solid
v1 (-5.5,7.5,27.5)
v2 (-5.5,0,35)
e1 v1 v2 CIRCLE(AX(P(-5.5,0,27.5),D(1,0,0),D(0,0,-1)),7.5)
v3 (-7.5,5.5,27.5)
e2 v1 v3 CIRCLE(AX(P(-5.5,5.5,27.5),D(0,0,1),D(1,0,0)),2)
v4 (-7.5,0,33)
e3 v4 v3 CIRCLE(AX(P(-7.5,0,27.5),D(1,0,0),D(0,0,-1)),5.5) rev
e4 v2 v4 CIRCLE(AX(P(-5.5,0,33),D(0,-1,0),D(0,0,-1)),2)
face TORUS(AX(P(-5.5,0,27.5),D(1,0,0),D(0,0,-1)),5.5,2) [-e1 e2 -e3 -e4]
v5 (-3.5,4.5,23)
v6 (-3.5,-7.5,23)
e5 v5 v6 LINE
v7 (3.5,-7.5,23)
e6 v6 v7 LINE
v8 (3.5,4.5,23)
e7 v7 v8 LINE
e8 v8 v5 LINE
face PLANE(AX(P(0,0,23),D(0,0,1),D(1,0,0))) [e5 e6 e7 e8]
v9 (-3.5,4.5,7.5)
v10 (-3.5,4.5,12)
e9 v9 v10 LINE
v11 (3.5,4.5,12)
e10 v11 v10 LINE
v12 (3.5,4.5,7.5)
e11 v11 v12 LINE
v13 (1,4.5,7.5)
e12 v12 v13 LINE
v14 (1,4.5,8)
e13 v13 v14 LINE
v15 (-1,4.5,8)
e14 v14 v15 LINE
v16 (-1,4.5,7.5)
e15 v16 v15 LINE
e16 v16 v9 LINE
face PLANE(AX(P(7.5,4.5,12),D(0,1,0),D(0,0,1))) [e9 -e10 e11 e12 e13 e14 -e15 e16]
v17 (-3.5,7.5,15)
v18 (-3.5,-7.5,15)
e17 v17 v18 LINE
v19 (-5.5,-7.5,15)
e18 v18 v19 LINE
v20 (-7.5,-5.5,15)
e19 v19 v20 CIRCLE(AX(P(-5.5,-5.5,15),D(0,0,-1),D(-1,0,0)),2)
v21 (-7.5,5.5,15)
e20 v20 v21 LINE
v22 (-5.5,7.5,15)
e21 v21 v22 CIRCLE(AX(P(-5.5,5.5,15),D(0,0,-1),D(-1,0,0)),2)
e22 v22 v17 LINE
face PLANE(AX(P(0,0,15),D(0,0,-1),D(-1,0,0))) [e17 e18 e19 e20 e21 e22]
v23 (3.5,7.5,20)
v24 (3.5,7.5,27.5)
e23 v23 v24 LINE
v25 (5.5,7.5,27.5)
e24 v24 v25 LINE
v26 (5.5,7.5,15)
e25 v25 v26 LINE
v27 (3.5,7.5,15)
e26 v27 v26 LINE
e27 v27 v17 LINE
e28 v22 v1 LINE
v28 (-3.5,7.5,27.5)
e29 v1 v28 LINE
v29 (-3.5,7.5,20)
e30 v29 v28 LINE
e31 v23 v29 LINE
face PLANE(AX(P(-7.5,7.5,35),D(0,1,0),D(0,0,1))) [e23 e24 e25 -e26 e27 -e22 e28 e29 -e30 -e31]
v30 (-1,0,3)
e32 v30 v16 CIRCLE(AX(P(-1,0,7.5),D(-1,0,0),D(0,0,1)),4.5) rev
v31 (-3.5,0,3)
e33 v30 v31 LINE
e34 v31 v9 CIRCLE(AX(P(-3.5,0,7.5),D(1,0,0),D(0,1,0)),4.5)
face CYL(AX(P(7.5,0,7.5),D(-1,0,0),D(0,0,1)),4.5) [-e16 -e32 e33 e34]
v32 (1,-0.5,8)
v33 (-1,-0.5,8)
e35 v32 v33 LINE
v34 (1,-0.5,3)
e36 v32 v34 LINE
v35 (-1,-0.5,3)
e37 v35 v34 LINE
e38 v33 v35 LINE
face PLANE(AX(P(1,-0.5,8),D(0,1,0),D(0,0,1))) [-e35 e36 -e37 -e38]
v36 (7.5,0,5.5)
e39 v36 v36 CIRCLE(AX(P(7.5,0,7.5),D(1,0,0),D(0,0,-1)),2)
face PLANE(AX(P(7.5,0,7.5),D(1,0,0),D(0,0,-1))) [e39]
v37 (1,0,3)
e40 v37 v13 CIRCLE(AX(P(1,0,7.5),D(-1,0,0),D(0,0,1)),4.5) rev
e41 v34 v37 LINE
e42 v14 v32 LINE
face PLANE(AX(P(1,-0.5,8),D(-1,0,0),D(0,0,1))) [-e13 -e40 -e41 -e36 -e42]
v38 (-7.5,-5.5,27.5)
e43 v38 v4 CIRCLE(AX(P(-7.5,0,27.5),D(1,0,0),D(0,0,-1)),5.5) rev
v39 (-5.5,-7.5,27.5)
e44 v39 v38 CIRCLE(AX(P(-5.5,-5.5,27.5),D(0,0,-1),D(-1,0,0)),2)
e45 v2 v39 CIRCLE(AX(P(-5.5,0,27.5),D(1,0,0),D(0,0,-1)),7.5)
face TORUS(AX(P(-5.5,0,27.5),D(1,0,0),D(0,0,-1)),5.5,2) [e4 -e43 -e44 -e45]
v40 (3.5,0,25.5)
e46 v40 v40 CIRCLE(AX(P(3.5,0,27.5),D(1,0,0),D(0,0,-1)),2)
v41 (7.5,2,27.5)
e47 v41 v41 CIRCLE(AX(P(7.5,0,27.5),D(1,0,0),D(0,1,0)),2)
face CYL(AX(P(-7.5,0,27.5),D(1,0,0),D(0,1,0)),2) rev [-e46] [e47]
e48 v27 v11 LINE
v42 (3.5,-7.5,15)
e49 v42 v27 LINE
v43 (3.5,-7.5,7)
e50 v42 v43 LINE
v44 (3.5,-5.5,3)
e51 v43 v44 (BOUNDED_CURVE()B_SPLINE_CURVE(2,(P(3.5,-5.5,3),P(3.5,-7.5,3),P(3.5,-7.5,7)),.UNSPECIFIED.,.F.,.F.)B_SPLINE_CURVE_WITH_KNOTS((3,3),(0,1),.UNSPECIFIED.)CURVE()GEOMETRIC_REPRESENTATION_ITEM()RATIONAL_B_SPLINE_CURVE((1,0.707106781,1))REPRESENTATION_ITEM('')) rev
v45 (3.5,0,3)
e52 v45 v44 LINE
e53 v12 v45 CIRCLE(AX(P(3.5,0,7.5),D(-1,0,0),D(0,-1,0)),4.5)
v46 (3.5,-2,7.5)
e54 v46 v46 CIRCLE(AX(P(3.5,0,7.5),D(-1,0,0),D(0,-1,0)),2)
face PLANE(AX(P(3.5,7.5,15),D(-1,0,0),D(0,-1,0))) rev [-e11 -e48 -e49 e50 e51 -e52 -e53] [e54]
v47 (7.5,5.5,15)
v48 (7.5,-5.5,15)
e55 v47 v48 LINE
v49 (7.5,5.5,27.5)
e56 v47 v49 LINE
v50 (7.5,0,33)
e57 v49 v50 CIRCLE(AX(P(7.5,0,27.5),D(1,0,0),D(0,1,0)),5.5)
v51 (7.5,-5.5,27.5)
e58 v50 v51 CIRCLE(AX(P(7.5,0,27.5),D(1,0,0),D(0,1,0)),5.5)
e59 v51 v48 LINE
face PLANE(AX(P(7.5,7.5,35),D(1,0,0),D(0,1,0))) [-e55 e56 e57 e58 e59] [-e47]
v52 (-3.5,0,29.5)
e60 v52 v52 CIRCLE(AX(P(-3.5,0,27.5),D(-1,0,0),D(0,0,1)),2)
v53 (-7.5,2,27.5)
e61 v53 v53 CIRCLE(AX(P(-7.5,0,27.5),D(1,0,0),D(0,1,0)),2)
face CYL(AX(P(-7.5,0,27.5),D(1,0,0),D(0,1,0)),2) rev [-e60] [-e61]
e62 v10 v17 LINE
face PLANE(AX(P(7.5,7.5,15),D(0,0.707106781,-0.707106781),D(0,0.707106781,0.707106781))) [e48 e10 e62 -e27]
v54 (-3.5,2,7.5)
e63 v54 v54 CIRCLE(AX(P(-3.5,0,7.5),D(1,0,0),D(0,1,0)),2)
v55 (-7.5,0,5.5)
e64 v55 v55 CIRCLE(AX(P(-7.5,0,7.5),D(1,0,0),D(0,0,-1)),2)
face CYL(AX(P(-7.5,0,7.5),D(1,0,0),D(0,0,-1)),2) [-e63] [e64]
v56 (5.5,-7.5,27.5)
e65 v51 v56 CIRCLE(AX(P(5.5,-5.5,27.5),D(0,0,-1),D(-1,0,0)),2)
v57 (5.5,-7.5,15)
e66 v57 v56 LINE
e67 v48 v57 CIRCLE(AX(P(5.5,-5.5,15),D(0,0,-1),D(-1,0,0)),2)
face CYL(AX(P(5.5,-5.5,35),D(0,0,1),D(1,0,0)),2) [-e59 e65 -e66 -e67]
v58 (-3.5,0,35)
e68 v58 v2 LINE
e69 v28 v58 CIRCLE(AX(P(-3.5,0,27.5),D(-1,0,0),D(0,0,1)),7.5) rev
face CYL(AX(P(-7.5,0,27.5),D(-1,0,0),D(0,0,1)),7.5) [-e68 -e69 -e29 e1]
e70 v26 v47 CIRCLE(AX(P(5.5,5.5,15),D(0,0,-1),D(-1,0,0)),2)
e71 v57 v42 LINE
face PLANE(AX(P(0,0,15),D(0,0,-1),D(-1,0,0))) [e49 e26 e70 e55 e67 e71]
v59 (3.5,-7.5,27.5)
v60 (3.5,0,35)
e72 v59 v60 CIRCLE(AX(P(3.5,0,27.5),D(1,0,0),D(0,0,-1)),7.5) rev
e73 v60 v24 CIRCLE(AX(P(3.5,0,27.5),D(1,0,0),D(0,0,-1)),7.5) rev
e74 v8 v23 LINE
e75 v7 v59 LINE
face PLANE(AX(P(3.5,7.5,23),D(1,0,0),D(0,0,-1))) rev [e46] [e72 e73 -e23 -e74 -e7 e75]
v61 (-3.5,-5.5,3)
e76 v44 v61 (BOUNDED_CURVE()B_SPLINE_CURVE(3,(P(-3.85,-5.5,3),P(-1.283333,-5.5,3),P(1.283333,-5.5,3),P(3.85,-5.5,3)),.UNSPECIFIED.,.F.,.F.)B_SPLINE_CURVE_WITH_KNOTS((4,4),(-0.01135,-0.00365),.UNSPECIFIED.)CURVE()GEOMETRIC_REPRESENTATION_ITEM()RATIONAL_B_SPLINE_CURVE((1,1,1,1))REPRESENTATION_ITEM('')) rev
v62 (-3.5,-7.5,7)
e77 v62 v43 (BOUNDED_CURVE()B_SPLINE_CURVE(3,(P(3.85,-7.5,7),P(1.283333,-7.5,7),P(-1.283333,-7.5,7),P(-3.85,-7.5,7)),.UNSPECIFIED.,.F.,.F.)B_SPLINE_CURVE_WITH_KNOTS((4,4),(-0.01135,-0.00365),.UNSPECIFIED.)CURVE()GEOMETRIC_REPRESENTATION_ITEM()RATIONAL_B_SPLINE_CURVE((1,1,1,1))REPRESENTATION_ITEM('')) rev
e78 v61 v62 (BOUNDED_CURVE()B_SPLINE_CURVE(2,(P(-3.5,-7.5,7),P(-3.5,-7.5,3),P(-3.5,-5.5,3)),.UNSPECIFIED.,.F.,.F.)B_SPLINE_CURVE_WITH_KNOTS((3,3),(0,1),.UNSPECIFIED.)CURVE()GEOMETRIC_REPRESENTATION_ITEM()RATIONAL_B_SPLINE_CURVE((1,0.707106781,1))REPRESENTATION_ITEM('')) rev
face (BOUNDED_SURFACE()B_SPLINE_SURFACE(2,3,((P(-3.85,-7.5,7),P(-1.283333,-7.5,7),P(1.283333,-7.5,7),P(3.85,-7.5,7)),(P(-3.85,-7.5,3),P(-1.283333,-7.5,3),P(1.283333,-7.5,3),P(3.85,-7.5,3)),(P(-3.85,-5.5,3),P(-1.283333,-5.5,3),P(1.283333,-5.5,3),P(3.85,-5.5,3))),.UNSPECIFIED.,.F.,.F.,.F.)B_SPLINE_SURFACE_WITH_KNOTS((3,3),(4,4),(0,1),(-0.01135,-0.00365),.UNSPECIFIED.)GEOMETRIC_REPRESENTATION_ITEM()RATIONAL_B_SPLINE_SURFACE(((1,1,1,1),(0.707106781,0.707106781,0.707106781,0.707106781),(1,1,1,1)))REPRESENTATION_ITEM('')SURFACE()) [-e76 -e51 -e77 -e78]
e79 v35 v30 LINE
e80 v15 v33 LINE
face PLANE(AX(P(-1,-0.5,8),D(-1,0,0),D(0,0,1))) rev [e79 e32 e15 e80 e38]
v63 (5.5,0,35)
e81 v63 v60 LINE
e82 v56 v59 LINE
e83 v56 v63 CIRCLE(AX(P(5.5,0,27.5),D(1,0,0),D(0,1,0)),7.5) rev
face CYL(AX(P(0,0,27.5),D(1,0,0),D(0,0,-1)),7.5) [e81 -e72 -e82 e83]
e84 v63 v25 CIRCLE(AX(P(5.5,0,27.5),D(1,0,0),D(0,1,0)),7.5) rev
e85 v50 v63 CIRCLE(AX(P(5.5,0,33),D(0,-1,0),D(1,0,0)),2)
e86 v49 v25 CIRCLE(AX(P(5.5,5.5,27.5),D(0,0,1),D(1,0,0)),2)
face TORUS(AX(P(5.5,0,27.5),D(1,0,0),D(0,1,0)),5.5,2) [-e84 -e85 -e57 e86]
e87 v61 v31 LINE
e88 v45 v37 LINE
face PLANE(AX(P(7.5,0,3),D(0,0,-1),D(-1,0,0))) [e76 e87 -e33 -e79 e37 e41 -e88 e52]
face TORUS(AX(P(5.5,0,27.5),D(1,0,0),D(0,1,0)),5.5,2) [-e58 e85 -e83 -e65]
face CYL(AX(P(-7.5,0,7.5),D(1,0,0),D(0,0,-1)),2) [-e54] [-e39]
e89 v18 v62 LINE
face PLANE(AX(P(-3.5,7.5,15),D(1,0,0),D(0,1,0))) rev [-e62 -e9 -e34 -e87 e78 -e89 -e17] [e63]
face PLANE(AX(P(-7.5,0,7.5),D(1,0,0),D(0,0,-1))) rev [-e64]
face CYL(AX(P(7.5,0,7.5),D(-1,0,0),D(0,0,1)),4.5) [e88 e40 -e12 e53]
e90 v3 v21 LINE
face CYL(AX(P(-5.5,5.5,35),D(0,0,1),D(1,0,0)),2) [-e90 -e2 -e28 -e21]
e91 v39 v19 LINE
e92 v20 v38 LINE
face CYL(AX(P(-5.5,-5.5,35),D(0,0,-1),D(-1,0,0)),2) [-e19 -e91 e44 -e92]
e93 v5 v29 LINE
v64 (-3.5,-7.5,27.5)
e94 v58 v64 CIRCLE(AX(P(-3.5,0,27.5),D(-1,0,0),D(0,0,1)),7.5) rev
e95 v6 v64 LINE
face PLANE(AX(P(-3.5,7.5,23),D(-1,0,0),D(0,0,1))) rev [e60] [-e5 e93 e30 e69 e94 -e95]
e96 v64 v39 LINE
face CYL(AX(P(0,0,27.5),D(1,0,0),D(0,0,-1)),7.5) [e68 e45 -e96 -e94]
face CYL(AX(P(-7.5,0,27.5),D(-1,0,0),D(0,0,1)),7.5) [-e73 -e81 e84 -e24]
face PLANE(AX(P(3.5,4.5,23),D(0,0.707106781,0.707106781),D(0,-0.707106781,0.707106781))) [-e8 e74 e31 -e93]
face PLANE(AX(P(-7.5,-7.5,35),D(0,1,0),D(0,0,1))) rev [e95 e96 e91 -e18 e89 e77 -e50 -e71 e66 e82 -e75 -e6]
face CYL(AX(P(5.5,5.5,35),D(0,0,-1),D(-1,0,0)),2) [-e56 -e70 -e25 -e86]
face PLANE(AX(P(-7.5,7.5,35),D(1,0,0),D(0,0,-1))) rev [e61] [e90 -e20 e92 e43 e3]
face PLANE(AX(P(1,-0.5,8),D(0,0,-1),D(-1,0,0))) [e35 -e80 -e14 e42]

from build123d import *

# Parameters (mm, degrees)
SKETCH1_W                = 15
SKETCH1_H                = 15
BOSS_EXTRUDE1_DEPTH      = 35
SKETCH3_W                = 7
SKETCH3_H                = 15
CUT_EXTRUDE1_DEPTH       = 12
SKETCH4_R                = 2
CUT_EXTRUDE2_DEPTH       = 15
SKETCH5_W                = 4
SKETCH5_H                = 15
CUT_EXTRUDE3_DEPTH       = 15
BOSS_EXTRUDE2_DEPTH      = 7.5
BOSS_EXTRUDE2_DEPTH_BACK = 7.5
SKETCH6_R                = 2
FILLET1_R                = 7.5
CUT_EXTRUDE6_DEPTH       = 3.5
CUT_EXTRUDE6_DEPTH_BACK  = 3.5
FILLET2_R                = 2
CUT_EXTRUDE7_DEPTH       = 7.5
CUT_EXTRUDE7_DEPTH_BACK  = 7.5
FILLET3_SIZE             = 4
FILLET3_SIZE_2           = 2
CUT_EXTRUDE8_DEPTH       = 1
CUT_EXTRUDE8_DEPTH_BACK  = 1


# Some blends are built 0.0001 mm under size
with BuildPart() as part:
    # Sketch1 → Boss-Extrude1 (new body)
    with BuildSketch(Plane.XY):
        Rectangle(SKETCH1_W, SKETCH1_H)
    extrude(amount=BOSS_EXTRUDE1_DEPTH)

    # Sketch3 → Cut-Extrude1 (cut)
    with BuildSketch(Plane.XY.offset(35)):
        Rectangle(SKETCH3_W, SKETCH3_H)
    extrude(amount=-CUT_EXTRUDE1_DEPTH, mode=Mode.SUBTRACT)

    # Sketch4 → Cut-Extrude2 (cut)
    with BuildSketch(Plane(origin=(7.5, 0, 0), x_dir=(0, 0, -1), z_dir=(1, 0, 0))):
        with Locations(Location((-27.5, 0, 0), (0, 0, 90))):
            Circle(SKETCH4_R)
    extrude(amount=-CUT_EXTRUDE2_DEPTH, mode=Mode.SUBTRACT)

    # Sketch5 → Cut-Extrude3 (cut)
    with BuildSketch(Plane(origin=(0, 0, 0), x_dir=(-1, 0, 0), z_dir=(0, 0, -1))):
        with Locations((-5.5, 0)):
            Rectangle(SKETCH5_W, SKETCH5_H)
        with Locations((5.5, 0)):
            Rectangle(SKETCH5_W, SKETCH5_H)
    extrude(amount=-CUT_EXTRUDE3_DEPTH, mode=Mode.SUBTRACT)

    # Sketch6 → Boss-Extrude2 (add, two sides: drawn at the far end of the back side and taken through both)
    with BuildSketch(Plane(origin=(0, 0, 0), x_dir=(0, 0, -1), z_dir=(1, 0, 0)).offset(-BOSS_EXTRUDE2_DEPTH_BACK)):
        with Locations((-7.5, 0)):
            Circle(SKETCH6_R)
    extrude(amount=BOSS_EXTRUDE2_DEPTH + BOSS_EXTRUDE2_DEPTH_BACK)

    # Fillet1
    fillet1_edges = [part.edges().sort_by_distance(p)[0] for p in [
        (5.5, -7.5, 35),
        (-5.5, -7.5, 35),
        (-5.5, 7.5, 35),
        (5.5, 7.5, 35),
    ]]
    fillet(fillet1_edges, radius=FILLET1_R - 0.0001)  # a hair under: the kernel refuses the full size

    # Sketch7 → Cut-Extrude6 (cut, two sides: drawn at the far end of the back side and taken through both)
    with BuildSketch(Plane(origin=(0, 0, 0), x_dir=(0, 0, -1), z_dir=(1, 0, 0)).offset(-CUT_EXTRUDE6_DEPTH_BACK)):
        Polygon((-23, 7.5), (-23, 4.5), (-20, 7.5), align=None)
    extrude(amount=CUT_EXTRUDE6_DEPTH + CUT_EXTRUDE6_DEPTH_BACK, mode=Mode.SUBTRACT)

    # Fillet2
    fillet2_edges = [part.edges().sort_by_distance(p)[0] for p in [
        (7.5, -7.5, 21.25005),
        (7.5, 7.5, 21.25005),
        (7.5, 5.303330148, 32.803330148),
        (7.5, -5.303330148, 32.803330148),
        (-7.5, -7.5, 21.25005),
        (-7.5, 7.5, 21.25005),
        (-7.5, 5.303330148, 32.803330148),
        (-7.5, -5.303330148, 32.803330148),
    ]]
    fillet(fillet2_edges, radius=FILLET2_R)

    # Sketch8 → Cut-Extrude7 (cut, two sides: drawn at the far end of the back side and taken through both)
    with BuildSketch(Plane(origin=(0, 0, 0), x_dir=(0, 0, -1), z_dir=(1, 0, 0)).offset(-CUT_EXTRUDE7_DEPTH_BACK)):
        with BuildLine():
            Line((-15, 7.5), (-12, 4.5))
            Line((-12, 4.5), (-7.5, 4.5))
            ThreePointArc((-7.5, 4.5), (-4.318019485, 3.181980515), (-3, 0))
            Line((-3, 0), (-3, -7.5))
            Line((-3, -7.5), (0, -7.5))
            Line((0, -7.5), (0, 7.5))
            Line((0, 7.5), (-15, 7.5))
        make_face()
    extrude(amount=CUT_EXTRUDE7_DEPTH + CUT_EXTRUDE7_DEPTH_BACK, mode=Mode.SUBTRACT)

    # Fillet3
    # an asymmetric fillet: 4, 2 mm, written as the material it takes off along each edge
    with BuildSketch(Plane(origin=(-13.5, -7.5, 3), x_dir=(0, 0, 1), z_dir=(1, 0, 0))) as fillet3_piece_1:
        with BuildLine():
            Bezier((FILLET3_SIZE, 0), (0, 0), (0, -FILLET3_SIZE_2), weights=[1, 0.707106781, 1])
            Line((0, -FILLET3_SIZE_2), (0, 0))
            Line((0, 0), (FILLET3_SIZE, 0))
        make_face()
    extrude(amount=27, mode=Mode.SUBTRACT)

    # Sketch9 → Cut-Extrude8 (cut, two sides: drawn at the far end of the back side and taken through both)
    with BuildSketch(Plane(origin=(0, 0, 0), x_dir=(0, 0, -1), z_dir=(1, 0, 0)).offset(-CUT_EXTRUDE8_DEPTH_BACK)):
        with BuildLine():
            Line((-8, -0.5), (-8, 9.147620524))
            ThreePointArc((-8, 9.147620524), (-1.178102105, 6.321897895), (1.647620524, -0.5))
            Line((1.647620524, -0.5), (-8, -0.5))
        make_face()
    extrude(amount=CUT_EXTRUDE8_DEPTH + CUT_EXTRUDE8_DEPTH_BACK, mode=Mode.SUBTRACT)


solid = part.part
